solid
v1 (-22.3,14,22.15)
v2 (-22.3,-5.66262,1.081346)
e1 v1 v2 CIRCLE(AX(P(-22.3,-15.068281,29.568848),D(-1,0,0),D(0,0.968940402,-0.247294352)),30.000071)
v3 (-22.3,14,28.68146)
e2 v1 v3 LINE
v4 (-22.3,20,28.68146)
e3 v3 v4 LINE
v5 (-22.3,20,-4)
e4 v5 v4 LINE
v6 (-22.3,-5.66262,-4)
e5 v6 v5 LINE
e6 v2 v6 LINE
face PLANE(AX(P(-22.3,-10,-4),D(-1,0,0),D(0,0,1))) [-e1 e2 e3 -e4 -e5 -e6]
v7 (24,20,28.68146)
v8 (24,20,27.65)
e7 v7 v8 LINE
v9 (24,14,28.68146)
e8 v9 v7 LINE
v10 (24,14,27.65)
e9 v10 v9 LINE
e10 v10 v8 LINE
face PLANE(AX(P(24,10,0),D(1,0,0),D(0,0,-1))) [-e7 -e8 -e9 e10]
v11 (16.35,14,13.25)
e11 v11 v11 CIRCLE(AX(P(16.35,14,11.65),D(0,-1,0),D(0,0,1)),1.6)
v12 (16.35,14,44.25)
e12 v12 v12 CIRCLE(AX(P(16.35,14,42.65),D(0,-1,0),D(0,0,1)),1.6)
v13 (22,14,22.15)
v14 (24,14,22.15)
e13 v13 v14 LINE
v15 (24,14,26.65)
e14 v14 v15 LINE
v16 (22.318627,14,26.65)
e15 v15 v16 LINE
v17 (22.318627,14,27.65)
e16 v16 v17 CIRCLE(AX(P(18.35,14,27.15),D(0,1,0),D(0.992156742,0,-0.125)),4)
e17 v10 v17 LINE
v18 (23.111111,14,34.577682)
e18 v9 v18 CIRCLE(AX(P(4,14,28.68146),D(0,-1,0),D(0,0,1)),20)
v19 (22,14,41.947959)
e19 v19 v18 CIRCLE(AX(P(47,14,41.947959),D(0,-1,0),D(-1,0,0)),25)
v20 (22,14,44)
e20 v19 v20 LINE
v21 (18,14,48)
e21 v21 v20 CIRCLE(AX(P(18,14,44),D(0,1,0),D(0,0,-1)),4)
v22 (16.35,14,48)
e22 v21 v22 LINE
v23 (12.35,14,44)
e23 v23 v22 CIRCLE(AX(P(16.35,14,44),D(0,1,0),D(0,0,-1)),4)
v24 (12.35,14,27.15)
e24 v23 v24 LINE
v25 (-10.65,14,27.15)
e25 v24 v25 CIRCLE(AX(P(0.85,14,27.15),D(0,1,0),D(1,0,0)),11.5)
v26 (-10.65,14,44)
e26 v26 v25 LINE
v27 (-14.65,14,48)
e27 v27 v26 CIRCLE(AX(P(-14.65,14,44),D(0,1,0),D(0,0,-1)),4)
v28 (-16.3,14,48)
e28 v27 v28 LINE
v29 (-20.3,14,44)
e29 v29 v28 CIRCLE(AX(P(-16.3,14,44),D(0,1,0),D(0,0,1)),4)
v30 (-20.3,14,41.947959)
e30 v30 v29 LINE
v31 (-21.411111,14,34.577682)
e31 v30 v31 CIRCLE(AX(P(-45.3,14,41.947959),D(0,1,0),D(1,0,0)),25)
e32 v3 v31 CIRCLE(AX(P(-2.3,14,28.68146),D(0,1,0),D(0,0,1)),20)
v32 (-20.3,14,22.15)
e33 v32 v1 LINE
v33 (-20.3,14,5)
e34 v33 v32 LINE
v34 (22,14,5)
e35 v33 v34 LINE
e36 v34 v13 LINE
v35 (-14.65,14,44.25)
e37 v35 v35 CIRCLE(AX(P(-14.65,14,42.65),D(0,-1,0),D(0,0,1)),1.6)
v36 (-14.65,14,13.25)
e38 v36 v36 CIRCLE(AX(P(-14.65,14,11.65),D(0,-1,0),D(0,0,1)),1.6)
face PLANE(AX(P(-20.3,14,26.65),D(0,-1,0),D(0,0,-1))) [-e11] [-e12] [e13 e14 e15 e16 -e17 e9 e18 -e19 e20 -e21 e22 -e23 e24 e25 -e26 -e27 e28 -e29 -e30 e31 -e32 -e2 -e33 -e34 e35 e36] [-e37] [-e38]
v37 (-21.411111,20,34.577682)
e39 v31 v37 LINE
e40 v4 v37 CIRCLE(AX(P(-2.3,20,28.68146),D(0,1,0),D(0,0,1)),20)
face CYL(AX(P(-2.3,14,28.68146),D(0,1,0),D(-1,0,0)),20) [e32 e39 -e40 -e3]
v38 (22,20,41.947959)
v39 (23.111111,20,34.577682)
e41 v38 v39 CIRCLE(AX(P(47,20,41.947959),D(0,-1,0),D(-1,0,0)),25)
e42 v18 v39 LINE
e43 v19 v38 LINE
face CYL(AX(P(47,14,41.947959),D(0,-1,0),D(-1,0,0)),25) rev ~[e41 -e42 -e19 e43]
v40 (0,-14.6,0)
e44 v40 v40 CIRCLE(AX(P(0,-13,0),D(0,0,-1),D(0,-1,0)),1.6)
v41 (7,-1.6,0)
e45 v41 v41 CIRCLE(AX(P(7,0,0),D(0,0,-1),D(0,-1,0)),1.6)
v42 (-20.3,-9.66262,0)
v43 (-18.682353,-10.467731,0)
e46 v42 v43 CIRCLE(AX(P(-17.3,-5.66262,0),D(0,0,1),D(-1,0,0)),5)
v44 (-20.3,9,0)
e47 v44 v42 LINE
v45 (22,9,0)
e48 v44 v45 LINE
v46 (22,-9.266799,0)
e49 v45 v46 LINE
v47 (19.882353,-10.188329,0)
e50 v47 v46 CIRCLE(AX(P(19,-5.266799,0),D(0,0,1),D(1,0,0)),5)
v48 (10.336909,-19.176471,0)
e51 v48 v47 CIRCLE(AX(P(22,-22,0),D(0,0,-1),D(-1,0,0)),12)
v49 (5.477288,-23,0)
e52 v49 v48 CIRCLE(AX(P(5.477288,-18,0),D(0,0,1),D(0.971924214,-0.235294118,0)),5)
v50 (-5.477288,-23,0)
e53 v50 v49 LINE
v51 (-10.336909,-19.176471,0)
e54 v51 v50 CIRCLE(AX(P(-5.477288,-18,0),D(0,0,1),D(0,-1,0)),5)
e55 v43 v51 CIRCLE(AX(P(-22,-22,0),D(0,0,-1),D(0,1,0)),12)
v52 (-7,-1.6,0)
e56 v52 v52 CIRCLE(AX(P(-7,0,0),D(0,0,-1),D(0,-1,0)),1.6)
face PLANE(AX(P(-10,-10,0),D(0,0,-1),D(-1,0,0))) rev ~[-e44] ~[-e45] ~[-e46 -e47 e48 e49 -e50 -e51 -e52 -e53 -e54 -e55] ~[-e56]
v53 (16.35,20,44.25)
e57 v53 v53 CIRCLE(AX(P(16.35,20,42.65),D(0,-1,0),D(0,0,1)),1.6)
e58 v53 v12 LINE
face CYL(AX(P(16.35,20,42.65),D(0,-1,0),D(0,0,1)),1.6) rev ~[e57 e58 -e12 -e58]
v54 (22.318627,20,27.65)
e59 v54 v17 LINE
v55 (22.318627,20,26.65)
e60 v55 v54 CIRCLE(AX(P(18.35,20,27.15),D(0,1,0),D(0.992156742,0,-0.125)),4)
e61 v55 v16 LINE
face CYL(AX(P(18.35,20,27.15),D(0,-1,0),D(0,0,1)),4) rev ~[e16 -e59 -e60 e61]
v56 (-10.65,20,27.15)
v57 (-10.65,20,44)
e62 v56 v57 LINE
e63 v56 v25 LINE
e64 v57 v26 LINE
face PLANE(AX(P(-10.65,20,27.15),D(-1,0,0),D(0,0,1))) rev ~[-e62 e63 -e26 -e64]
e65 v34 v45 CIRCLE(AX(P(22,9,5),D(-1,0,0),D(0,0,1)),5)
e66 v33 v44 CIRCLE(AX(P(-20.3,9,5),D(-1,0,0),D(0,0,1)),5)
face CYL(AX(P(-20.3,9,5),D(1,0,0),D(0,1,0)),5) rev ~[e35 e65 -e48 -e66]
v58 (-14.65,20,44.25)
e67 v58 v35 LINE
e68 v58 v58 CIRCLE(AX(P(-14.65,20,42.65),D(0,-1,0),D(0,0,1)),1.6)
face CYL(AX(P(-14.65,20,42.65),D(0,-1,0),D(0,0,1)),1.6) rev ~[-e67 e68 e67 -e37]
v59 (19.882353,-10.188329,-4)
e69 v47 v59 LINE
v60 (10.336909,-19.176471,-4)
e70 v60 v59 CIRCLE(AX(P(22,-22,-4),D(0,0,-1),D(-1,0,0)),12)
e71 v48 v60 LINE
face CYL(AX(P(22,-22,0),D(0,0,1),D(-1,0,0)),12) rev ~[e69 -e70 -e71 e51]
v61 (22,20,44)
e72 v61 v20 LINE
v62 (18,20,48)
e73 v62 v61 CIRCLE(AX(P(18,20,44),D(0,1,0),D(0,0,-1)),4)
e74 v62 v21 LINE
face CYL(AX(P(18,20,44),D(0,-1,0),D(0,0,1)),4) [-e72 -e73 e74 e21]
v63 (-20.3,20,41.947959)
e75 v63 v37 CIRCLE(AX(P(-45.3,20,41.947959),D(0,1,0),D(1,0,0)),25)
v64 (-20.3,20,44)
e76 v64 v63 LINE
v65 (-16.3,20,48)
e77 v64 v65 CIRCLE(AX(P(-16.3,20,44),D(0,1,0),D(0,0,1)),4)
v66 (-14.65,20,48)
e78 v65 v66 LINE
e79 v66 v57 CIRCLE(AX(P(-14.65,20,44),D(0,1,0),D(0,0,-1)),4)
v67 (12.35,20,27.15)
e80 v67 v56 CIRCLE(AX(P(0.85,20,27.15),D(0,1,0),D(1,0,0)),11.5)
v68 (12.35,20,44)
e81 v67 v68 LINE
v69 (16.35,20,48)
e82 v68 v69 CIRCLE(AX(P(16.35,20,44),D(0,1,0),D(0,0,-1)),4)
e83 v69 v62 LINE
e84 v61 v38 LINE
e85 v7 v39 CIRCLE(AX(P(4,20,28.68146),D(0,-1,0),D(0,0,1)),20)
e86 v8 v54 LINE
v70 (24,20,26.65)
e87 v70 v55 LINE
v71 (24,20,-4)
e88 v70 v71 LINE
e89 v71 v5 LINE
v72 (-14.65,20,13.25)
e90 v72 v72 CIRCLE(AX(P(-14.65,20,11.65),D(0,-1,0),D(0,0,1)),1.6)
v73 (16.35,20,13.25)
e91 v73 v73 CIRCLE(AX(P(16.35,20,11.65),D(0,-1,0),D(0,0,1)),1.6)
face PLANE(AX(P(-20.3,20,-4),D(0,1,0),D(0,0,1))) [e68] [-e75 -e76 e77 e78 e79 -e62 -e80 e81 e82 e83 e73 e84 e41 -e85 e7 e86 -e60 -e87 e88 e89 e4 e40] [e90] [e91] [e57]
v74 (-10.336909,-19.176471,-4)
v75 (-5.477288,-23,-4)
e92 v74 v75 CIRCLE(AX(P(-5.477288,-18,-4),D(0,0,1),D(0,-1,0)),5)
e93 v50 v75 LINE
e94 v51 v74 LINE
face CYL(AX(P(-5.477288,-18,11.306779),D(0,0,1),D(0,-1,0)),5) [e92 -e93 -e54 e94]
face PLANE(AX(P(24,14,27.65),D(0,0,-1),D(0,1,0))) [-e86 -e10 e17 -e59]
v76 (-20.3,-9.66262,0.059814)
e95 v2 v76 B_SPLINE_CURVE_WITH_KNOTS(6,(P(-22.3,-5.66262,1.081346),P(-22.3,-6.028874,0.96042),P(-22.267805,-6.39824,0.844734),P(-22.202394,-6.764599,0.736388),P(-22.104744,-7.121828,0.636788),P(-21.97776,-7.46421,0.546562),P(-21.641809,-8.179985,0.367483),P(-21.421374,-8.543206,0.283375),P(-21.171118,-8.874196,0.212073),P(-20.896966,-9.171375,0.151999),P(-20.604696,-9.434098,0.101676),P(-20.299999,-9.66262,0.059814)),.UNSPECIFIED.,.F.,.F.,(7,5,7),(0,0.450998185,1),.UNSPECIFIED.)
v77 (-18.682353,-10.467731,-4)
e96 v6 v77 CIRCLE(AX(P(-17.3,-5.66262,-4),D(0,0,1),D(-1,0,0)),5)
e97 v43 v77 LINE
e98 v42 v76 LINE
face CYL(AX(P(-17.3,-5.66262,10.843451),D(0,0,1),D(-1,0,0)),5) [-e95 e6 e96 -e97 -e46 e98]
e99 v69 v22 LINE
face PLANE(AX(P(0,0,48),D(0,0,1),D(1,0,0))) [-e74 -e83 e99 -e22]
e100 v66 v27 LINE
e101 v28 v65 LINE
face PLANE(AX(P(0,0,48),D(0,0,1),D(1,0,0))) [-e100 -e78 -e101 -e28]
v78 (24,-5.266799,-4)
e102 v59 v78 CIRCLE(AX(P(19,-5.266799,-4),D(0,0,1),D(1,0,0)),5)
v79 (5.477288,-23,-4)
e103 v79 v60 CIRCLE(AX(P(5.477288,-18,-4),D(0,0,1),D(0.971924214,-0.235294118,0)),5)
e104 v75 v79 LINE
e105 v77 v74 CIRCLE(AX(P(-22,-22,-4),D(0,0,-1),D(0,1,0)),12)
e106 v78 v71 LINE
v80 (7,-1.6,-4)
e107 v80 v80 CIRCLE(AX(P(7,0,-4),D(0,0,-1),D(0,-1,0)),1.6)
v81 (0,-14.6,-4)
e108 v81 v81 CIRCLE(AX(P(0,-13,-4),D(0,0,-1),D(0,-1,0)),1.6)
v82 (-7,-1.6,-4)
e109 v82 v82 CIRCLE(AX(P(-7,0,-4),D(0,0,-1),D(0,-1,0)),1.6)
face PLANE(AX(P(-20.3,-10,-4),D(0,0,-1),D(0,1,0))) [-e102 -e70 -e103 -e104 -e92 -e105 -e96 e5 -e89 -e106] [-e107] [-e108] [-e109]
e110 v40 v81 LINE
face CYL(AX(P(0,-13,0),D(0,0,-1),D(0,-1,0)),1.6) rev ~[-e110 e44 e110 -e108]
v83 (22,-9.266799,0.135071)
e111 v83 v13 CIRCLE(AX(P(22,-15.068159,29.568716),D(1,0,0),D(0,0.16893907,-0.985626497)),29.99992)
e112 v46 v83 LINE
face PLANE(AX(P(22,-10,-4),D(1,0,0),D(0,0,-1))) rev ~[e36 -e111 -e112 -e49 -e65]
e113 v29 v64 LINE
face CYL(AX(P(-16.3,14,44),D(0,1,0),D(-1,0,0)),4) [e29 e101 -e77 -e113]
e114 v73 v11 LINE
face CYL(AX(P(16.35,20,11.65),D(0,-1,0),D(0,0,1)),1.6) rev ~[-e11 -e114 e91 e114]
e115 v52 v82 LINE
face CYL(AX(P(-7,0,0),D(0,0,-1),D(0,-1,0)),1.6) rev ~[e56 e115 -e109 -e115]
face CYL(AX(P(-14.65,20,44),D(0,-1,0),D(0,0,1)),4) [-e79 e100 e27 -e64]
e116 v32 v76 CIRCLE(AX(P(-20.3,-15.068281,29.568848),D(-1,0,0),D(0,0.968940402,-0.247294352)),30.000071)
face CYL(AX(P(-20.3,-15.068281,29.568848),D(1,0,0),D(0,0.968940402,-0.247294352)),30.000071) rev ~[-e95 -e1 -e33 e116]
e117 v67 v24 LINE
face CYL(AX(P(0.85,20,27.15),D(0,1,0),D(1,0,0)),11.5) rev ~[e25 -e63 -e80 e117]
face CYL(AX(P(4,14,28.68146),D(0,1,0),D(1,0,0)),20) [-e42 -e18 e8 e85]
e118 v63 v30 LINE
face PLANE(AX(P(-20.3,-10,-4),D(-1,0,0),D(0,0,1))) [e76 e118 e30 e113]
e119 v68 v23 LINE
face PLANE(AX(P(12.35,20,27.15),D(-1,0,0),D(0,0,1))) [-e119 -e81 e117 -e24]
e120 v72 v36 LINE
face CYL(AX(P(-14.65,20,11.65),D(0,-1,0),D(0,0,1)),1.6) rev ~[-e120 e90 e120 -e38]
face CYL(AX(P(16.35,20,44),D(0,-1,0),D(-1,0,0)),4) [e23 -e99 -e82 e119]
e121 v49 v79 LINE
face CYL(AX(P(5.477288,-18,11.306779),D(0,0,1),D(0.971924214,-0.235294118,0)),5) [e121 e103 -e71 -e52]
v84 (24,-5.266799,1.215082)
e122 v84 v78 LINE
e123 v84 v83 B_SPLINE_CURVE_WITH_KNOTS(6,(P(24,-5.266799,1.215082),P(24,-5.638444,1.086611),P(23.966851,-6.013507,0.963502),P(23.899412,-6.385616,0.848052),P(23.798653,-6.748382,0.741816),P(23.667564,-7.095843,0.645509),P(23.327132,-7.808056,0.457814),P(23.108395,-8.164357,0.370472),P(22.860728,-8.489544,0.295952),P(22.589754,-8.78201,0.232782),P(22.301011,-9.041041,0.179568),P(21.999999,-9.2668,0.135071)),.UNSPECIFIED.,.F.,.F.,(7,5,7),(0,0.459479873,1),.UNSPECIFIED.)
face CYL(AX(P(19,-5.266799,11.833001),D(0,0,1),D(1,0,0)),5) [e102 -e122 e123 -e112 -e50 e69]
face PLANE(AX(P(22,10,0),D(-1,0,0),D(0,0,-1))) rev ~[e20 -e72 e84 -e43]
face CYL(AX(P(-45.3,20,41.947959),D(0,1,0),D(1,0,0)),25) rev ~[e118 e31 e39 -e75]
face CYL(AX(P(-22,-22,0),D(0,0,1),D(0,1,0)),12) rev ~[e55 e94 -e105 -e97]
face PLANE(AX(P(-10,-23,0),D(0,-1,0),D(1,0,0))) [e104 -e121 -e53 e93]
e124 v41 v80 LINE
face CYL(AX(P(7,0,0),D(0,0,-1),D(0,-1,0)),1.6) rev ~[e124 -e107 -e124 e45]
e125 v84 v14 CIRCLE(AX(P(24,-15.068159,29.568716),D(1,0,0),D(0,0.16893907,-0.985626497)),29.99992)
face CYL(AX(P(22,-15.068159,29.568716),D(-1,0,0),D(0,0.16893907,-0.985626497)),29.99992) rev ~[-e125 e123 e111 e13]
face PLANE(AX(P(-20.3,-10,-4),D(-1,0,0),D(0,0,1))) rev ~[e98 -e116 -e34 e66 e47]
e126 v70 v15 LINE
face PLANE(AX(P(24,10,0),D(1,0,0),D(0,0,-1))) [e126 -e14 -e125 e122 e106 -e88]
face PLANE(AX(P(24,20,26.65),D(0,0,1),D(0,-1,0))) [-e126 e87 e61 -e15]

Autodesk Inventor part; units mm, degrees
ref_plane "YZ Plane" through (0, 0, 0) normal (1, 0, 0) x (0, 1, 0)
ref_plane "XZ Plane" through (0, 0, 0) normal (0, 1, 0) x (-1, 0, 0)
ref_plane "XY Plane" through (0, 0, 0) normal (0, 0, 1) x (1, 0, 0)
sketch "hole points" plane through (0, 0, 0) normal (0, 0, 1) x (1, 0, 0)
  line L0 (-7, 0) -> (7, 0) construction
  line L1 (0, 0) -> (0, -13) construction
  dimension "d0" = 14
  dimension "d1" = 13
sketch "Sketch3" plane through (0, 0, 0) normal (0, 0, 1) x (1, 0, 0)
  line L0 (-7, 0) -> (7, 0) construction
  line L1 (-7, 0) -> (7, 0) construction
  line L2 (-9, -2) -> (9, -2)
  line L3 (9, -2) -> (9, 2)
  line L4 (9, 2) -> (-9, 2)
  line L5 (-9, 2) -> (-9, -2)
  line L6 (-9, -2) -> (9, 2) construction
  line L7 (9, -2) -> (-9, 2) construction
  line L8 (0, 0) -> (0, -13) construction
  line L9 (-2, 2) -> (2, 2)
  line L10 (2, 2) -> (2, -15)
  line L11 (2, -15) -> (-2, -15)
  line L12 (-2, -15) -> (-2, 2)
  line L13 (17, -10) -> (-17, -10)
  line L14 (-17, -10) -> (-17, 10)
  line L15 (-17, 10) -> (17, 10)
  line L16 (17, 10) -> (17, -10)
  line L17 (10, -23) -> (10, 10)
  line L18 (10, 10) -> (-10, 10)
  line L19 (-10, 10) -> (-10, -23)
  line L20 (-10, -23) -> (10, -23)
  point P0 (0, -6.5)
  point P1 (0, 2)
  point P2 (0, -6.5)
  point P3 (0, 2)
  dimension "d31" = 18
  dimension "d32" = 4
  dimension "d33" = 4
  dimension "d34" = 17
  dimension "d35" = 8
  dimension "d36" = 8
extrude "back plate Extrusion2" add sketch "Sketch3" against normal blind 4
hole "Hole3" at (-7, 0, 0) at (7, 0, 0) at (0, -13, 0) direction (0, 0, -1) diameter 3.2 end through all
sketch "Sketch4" plane through (-17, 10, 0) normal (0, 1, 0) x (1, 0, 0)
  circle A0 centre (17.85, -27.15) radius 11 projected
  circle A1 centre (2.35, -42.65) radius 1.5 projected
  circle A2 centre (33.35, -11.65) radius 1.5 projected
  circle A3 centre (33.35, -42.65) radius 1.5 projected
  circle A4 centre (2.35, -11.65) radius 1.5 projected
  line L0 (-3.3, -10) -> (0.7, -6) projected
  line L1 (-3.3, -44.3) -> (-3.3, -10) projected
  line L2 (0.7, -48.3) -> (-3.3, -44.3) projected
  line L3 (35, -48.3) -> (0.7, -48.3) projected
  line L4 (39, -44.3) -> (35, -48.3) projected
  line L5 (39, -10) -> (39, -44.3) projected
  line L6 (35, -6) -> (39, -10) projected
  line L7 (0.7, -6) -> (35, -6) projected
  line L8 (-3.3, 0) -> (39, 0)
  line L9 (39, 0) -> (39, 4)
  line L10 (39, 4) -> (-3.3, 4)
  line L11 (-3.3, 4) -> (-3.3, 0)
  line L12 (0, 4) -> (34, 4) projected
  point P0 (17, 0)
  point P1 (17.85, 4)
  point P2 (17, 4)
  point P3 (-3.3, 2)
  point P4 (39, 2)
  dimension "d44" = 4
extrude "Extrusion3" add sketch "Sketch4" along normal blind 10 contours L11 L10 L9 L8
sketch "Sketch5" plane through (0, 0, 0) normal (0, 0, 1) x (1, 0, 0)
  line L0 (-16.3, 14) -> (18, 14) projected
  line L1 (-20.3, 20) -> (22, 20)
  line L2 (22, 20) -> (22, 14)
  line L3 (22, 14) -> (-20.3, 14)
  line L4 (-20.3, 14) -> (-20.3, 20)
  point P0 (0, 0)
  dimension "d47" = 42.3
extrude "Extrusion4" add sketch "Sketch5" along normal blind 48
sketch "Sketch6" plane through (-17, 20, 0) normal (0, 1, 0) x (1, 0, 0)
  circle A0 centre (17.85, -27.15) radius 10.5 projected
  circle A1 centre (17.85, -27.15) radius 11.5
  circle A2 centre (2.35, -42.65) radius 1.5 construction
  circle A3 centre (33.35, -42.65) radius 1.5 construction
  circle A4 centre (33.35, -11.65) radius 1.5 construction
  circle A5 centre (2.35, -11.65) radius 1.5 construction
  line L0 (6.35, -27.15) -> (6.35, -48)
  line L1 (39, -48) -> (-3.3, -48) projected
  line L2 (29.35, -27.15) -> (29.35, -48)
  line L3 (29.35, -48) -> (6.35, -48)
  point P0 (17, 0)
  dimension "d50" = 1
extrude "Extrusion5" cut sketch "Sketch6" against normal through all contours A0 | A1 | L2 L1 L0 A1
sketch "Sketch7" plane through (-17, 20, 0) normal (0, 1, 0) x (1, 0, 0)
  circle A0 centre (2.35, -42.65) radius 1.5 projected
  circle A1 centre (33.35, -42.65) radius 1.5 projected
  circle A2 centre (33.35, -11.65) radius 1.5 projected
  circle A3 centre (2.35, -11.65) radius 1.5 projected
  point P0 (17, 0)
hole "Hole4" at (-14.65, 20, 11.65) at (16.35, 20, 11.65) at (16.35, 20, 42.65) at (-14.65, 20, 42.65) direction (0, -1, 0) diameter 3.2 end through all
sketch "Sketch8" plane through (22, 10, 0) normal (1, 0, 0) x (0, 0, -1)
  line L0 (-24.65, 27.5) -> (-29.65, 27.5) projected
  line L1 (-22.15, 4) -> (-32.15, 4)
  line L2 (-32.15, 4) -> (-32.15, 10)
  line L3 (-32.15, 10) -> (-22.15, 10)
  line L4 (-22.15, 10) -> (-22.15, 4)
  point P0 (0, -10)
  point P1 (-27.15, 10)
  point P2 (-27.15, 27.5)
  point P3 (-27.15, 10)
  dimension "d62" = 10
  dimension "d63" = 6
extrude "Extrusion6" add sketch "Sketch8" along normal blind 2
sketch "Sketch9" plane through (-17, 20, 0) normal (0, 1, 0) x (1, 0, 0)
  circle A0 centre (17.85, -27.15) radius 2.5 construction
  line L0 (17.85, -27.15) -> (35.35, -27.15) construction
  point P0 (17, 0)
  dimension "d66" = 17.5
hole "Hole5" at (18.35, 20, 27.15) direction (0, -1, 0) diameter 8 end through all
sketch "Sketch10" plane through (24, 10, 0) normal (1, 0, 0) x (0, 0, -1)
  line L0 (-32.15, 4) -> (-22.15, 4) projected
  line L1 (-22.15, 4) -> (-22.15, 10) projected
  line L2 (-22.15, 10) -> (-32.15, 10) projected
  line L3 (-32.15, 10) -> (-32.15, 4) projected
  line L4 (-27.65, 10) -> (-26.65, 10)
  line L5 (-26.65, 10) -> (-26.65, 4)
  line L6 (-26.65, 4) -> (-27.65, 4)
  line L7 (-27.65, 4) -> (-27.65, 10)
  line L8 (-22.15, 10) -> (-32.15, 10) projected
  point P0 (0, -10)
  point P1 (-27.15, 10)
  point P2 (-27.15, 10)
  point P3 (-27.15, 10)
  dimension "d74" = 1
  dimension "d75" = 6
extrude "Extrusion7" cut sketch "Sketch10" against normal blind 5 contours L7 L2 L5 L0
sketch "Sketch11" plane through (-17, -10, -4) normal (-1, 0, 0) x (0, 0, 1)
  line L0 (4, 0) -> (4, 20) projected
  line L1 (4, 20) -> (0, 20) projected
  line L2 (0, 0) -> (0, 20) projected
  line L3 (4, 0) -> (0, 0) projected
  point P0 (4, 10)
extrude "Extrusion8" add sketch "Sketch11" along normal blind 3.3
sketch "Sketch12" plane through (17, -10, 0) normal (1, 0, 0) x (0, 0, -1)
  line L0 (0, 20) -> (0, 0) projected
  line L1 (0, 0) -> (4, 0) projected
  line L2 (4, 20) -> (4, 0) projected
  line L3 (0, 20) -> (4, 20) projected
  point P0 (0, 10)
extrude "Extrusion9" add sketch "Sketch12" along normal blind 5
fillet "Fillet3" radius 4 4 edges at (22, 17, 48) (12.35, 17, 48) (-10.65, 17, 48) (-20.3, 17, 48)
fillet "Fillet6" radius 5 1 edges at (0.85, 14, 0)
sketch "Sketch15" plane through (22, -10, -4) normal (1, 0, 0) x (0, 0, -1)
  line L0 (-26.15, 30) -> (-26.15, 24) projected
  line L1 (-9, 24) -> (-26.15, 24) projected
  arc A0 (-4, 19) -> (-9, 24) centre (-9, 19) ccw projected
  line L2 (-4, 0) -> (-4, 19) projected
  line L3 (-4, 0) -> (0, 0) projected
  line L4 (0, 0) -> (0, 30) projected
  line L5 (0, 30) -> (-26.15, 30) projected
  arc A1 (-4, 0) -> (-26.15, 24) centre (-33.5688, -5.0682) ccw
  line L6 (-26.15, 24) -> (-26.15, 30)
  line L7 (-26.15, 30) -> (0, 30)
  line L8 (0, 30) -> (-26.15, 30) projected
  line L9 (0, 30) -> (0, 0)
  line L10 (0, 0) -> (0, 30) projected
  line L11 (0, 0) -> (-4, 0)
  point P0 (-4, 10)
  dimension "d97" = 30
extrude "Extrusion12" add sketch "Sketch15" along normal blind 2
sketch "Sketch16" plane through (-20.3, -10, -4) normal (-1, 0, 0) x (0, 0, 1)
  line L0 (30.65, 30) -> (30.65, 24) projected
  line L1 (30.65, 24) -> (26.15, 24) projected
  arc A0 (26.15, 24) -> (4, 0) centre (33.5688, -5.0682) ccw projected
  line L2 (4, 0) -> (0, 0) projected
  line L3 (0, 0) -> (0, 30) projected
  line L4 (0, 30) -> (30.65, 30) projected
  point P0 (4, 10)
extrude "Extrusion13" add sketch "Sketch16" along normal blind 2
fillet "Fillet10" radius 12 2 edges at (-10, -10, -2) (10, -10, -2)
fillet "Fillet11" radius 5 4 edges at (-22.3, -10, -2) (-10, -23, -2) (10, -23, -2) (24, -10, -2)
sketch "Sketch17" plane through (-20.3, 14, 26.65) normal (0, 0, 1) x (1, 0, 0)
  line L0 (0, 6) -> (0, 0) projected
  line L1 (0, 6) -> (-2, 6) projected
  line L2 (-2, 0) -> (-2, 6) projected
  line L3 (0, 0) -> (-2, 0) projected
  point P0 (20.3, -14)
extrude "Extrusion14" add sketch "Sketch17" along normal blind 5.5
fillet "Fillet14" radius 25 2 edges at (-20.3, 17, 32.15) (22, 17, 32.15)
fillet "Fillet15" radius 20 2 edges at (-22.3, 17, 32.15) (24, 17, 32.15)
properties part number "bottom-right bracket" material "ABS Plastic"
